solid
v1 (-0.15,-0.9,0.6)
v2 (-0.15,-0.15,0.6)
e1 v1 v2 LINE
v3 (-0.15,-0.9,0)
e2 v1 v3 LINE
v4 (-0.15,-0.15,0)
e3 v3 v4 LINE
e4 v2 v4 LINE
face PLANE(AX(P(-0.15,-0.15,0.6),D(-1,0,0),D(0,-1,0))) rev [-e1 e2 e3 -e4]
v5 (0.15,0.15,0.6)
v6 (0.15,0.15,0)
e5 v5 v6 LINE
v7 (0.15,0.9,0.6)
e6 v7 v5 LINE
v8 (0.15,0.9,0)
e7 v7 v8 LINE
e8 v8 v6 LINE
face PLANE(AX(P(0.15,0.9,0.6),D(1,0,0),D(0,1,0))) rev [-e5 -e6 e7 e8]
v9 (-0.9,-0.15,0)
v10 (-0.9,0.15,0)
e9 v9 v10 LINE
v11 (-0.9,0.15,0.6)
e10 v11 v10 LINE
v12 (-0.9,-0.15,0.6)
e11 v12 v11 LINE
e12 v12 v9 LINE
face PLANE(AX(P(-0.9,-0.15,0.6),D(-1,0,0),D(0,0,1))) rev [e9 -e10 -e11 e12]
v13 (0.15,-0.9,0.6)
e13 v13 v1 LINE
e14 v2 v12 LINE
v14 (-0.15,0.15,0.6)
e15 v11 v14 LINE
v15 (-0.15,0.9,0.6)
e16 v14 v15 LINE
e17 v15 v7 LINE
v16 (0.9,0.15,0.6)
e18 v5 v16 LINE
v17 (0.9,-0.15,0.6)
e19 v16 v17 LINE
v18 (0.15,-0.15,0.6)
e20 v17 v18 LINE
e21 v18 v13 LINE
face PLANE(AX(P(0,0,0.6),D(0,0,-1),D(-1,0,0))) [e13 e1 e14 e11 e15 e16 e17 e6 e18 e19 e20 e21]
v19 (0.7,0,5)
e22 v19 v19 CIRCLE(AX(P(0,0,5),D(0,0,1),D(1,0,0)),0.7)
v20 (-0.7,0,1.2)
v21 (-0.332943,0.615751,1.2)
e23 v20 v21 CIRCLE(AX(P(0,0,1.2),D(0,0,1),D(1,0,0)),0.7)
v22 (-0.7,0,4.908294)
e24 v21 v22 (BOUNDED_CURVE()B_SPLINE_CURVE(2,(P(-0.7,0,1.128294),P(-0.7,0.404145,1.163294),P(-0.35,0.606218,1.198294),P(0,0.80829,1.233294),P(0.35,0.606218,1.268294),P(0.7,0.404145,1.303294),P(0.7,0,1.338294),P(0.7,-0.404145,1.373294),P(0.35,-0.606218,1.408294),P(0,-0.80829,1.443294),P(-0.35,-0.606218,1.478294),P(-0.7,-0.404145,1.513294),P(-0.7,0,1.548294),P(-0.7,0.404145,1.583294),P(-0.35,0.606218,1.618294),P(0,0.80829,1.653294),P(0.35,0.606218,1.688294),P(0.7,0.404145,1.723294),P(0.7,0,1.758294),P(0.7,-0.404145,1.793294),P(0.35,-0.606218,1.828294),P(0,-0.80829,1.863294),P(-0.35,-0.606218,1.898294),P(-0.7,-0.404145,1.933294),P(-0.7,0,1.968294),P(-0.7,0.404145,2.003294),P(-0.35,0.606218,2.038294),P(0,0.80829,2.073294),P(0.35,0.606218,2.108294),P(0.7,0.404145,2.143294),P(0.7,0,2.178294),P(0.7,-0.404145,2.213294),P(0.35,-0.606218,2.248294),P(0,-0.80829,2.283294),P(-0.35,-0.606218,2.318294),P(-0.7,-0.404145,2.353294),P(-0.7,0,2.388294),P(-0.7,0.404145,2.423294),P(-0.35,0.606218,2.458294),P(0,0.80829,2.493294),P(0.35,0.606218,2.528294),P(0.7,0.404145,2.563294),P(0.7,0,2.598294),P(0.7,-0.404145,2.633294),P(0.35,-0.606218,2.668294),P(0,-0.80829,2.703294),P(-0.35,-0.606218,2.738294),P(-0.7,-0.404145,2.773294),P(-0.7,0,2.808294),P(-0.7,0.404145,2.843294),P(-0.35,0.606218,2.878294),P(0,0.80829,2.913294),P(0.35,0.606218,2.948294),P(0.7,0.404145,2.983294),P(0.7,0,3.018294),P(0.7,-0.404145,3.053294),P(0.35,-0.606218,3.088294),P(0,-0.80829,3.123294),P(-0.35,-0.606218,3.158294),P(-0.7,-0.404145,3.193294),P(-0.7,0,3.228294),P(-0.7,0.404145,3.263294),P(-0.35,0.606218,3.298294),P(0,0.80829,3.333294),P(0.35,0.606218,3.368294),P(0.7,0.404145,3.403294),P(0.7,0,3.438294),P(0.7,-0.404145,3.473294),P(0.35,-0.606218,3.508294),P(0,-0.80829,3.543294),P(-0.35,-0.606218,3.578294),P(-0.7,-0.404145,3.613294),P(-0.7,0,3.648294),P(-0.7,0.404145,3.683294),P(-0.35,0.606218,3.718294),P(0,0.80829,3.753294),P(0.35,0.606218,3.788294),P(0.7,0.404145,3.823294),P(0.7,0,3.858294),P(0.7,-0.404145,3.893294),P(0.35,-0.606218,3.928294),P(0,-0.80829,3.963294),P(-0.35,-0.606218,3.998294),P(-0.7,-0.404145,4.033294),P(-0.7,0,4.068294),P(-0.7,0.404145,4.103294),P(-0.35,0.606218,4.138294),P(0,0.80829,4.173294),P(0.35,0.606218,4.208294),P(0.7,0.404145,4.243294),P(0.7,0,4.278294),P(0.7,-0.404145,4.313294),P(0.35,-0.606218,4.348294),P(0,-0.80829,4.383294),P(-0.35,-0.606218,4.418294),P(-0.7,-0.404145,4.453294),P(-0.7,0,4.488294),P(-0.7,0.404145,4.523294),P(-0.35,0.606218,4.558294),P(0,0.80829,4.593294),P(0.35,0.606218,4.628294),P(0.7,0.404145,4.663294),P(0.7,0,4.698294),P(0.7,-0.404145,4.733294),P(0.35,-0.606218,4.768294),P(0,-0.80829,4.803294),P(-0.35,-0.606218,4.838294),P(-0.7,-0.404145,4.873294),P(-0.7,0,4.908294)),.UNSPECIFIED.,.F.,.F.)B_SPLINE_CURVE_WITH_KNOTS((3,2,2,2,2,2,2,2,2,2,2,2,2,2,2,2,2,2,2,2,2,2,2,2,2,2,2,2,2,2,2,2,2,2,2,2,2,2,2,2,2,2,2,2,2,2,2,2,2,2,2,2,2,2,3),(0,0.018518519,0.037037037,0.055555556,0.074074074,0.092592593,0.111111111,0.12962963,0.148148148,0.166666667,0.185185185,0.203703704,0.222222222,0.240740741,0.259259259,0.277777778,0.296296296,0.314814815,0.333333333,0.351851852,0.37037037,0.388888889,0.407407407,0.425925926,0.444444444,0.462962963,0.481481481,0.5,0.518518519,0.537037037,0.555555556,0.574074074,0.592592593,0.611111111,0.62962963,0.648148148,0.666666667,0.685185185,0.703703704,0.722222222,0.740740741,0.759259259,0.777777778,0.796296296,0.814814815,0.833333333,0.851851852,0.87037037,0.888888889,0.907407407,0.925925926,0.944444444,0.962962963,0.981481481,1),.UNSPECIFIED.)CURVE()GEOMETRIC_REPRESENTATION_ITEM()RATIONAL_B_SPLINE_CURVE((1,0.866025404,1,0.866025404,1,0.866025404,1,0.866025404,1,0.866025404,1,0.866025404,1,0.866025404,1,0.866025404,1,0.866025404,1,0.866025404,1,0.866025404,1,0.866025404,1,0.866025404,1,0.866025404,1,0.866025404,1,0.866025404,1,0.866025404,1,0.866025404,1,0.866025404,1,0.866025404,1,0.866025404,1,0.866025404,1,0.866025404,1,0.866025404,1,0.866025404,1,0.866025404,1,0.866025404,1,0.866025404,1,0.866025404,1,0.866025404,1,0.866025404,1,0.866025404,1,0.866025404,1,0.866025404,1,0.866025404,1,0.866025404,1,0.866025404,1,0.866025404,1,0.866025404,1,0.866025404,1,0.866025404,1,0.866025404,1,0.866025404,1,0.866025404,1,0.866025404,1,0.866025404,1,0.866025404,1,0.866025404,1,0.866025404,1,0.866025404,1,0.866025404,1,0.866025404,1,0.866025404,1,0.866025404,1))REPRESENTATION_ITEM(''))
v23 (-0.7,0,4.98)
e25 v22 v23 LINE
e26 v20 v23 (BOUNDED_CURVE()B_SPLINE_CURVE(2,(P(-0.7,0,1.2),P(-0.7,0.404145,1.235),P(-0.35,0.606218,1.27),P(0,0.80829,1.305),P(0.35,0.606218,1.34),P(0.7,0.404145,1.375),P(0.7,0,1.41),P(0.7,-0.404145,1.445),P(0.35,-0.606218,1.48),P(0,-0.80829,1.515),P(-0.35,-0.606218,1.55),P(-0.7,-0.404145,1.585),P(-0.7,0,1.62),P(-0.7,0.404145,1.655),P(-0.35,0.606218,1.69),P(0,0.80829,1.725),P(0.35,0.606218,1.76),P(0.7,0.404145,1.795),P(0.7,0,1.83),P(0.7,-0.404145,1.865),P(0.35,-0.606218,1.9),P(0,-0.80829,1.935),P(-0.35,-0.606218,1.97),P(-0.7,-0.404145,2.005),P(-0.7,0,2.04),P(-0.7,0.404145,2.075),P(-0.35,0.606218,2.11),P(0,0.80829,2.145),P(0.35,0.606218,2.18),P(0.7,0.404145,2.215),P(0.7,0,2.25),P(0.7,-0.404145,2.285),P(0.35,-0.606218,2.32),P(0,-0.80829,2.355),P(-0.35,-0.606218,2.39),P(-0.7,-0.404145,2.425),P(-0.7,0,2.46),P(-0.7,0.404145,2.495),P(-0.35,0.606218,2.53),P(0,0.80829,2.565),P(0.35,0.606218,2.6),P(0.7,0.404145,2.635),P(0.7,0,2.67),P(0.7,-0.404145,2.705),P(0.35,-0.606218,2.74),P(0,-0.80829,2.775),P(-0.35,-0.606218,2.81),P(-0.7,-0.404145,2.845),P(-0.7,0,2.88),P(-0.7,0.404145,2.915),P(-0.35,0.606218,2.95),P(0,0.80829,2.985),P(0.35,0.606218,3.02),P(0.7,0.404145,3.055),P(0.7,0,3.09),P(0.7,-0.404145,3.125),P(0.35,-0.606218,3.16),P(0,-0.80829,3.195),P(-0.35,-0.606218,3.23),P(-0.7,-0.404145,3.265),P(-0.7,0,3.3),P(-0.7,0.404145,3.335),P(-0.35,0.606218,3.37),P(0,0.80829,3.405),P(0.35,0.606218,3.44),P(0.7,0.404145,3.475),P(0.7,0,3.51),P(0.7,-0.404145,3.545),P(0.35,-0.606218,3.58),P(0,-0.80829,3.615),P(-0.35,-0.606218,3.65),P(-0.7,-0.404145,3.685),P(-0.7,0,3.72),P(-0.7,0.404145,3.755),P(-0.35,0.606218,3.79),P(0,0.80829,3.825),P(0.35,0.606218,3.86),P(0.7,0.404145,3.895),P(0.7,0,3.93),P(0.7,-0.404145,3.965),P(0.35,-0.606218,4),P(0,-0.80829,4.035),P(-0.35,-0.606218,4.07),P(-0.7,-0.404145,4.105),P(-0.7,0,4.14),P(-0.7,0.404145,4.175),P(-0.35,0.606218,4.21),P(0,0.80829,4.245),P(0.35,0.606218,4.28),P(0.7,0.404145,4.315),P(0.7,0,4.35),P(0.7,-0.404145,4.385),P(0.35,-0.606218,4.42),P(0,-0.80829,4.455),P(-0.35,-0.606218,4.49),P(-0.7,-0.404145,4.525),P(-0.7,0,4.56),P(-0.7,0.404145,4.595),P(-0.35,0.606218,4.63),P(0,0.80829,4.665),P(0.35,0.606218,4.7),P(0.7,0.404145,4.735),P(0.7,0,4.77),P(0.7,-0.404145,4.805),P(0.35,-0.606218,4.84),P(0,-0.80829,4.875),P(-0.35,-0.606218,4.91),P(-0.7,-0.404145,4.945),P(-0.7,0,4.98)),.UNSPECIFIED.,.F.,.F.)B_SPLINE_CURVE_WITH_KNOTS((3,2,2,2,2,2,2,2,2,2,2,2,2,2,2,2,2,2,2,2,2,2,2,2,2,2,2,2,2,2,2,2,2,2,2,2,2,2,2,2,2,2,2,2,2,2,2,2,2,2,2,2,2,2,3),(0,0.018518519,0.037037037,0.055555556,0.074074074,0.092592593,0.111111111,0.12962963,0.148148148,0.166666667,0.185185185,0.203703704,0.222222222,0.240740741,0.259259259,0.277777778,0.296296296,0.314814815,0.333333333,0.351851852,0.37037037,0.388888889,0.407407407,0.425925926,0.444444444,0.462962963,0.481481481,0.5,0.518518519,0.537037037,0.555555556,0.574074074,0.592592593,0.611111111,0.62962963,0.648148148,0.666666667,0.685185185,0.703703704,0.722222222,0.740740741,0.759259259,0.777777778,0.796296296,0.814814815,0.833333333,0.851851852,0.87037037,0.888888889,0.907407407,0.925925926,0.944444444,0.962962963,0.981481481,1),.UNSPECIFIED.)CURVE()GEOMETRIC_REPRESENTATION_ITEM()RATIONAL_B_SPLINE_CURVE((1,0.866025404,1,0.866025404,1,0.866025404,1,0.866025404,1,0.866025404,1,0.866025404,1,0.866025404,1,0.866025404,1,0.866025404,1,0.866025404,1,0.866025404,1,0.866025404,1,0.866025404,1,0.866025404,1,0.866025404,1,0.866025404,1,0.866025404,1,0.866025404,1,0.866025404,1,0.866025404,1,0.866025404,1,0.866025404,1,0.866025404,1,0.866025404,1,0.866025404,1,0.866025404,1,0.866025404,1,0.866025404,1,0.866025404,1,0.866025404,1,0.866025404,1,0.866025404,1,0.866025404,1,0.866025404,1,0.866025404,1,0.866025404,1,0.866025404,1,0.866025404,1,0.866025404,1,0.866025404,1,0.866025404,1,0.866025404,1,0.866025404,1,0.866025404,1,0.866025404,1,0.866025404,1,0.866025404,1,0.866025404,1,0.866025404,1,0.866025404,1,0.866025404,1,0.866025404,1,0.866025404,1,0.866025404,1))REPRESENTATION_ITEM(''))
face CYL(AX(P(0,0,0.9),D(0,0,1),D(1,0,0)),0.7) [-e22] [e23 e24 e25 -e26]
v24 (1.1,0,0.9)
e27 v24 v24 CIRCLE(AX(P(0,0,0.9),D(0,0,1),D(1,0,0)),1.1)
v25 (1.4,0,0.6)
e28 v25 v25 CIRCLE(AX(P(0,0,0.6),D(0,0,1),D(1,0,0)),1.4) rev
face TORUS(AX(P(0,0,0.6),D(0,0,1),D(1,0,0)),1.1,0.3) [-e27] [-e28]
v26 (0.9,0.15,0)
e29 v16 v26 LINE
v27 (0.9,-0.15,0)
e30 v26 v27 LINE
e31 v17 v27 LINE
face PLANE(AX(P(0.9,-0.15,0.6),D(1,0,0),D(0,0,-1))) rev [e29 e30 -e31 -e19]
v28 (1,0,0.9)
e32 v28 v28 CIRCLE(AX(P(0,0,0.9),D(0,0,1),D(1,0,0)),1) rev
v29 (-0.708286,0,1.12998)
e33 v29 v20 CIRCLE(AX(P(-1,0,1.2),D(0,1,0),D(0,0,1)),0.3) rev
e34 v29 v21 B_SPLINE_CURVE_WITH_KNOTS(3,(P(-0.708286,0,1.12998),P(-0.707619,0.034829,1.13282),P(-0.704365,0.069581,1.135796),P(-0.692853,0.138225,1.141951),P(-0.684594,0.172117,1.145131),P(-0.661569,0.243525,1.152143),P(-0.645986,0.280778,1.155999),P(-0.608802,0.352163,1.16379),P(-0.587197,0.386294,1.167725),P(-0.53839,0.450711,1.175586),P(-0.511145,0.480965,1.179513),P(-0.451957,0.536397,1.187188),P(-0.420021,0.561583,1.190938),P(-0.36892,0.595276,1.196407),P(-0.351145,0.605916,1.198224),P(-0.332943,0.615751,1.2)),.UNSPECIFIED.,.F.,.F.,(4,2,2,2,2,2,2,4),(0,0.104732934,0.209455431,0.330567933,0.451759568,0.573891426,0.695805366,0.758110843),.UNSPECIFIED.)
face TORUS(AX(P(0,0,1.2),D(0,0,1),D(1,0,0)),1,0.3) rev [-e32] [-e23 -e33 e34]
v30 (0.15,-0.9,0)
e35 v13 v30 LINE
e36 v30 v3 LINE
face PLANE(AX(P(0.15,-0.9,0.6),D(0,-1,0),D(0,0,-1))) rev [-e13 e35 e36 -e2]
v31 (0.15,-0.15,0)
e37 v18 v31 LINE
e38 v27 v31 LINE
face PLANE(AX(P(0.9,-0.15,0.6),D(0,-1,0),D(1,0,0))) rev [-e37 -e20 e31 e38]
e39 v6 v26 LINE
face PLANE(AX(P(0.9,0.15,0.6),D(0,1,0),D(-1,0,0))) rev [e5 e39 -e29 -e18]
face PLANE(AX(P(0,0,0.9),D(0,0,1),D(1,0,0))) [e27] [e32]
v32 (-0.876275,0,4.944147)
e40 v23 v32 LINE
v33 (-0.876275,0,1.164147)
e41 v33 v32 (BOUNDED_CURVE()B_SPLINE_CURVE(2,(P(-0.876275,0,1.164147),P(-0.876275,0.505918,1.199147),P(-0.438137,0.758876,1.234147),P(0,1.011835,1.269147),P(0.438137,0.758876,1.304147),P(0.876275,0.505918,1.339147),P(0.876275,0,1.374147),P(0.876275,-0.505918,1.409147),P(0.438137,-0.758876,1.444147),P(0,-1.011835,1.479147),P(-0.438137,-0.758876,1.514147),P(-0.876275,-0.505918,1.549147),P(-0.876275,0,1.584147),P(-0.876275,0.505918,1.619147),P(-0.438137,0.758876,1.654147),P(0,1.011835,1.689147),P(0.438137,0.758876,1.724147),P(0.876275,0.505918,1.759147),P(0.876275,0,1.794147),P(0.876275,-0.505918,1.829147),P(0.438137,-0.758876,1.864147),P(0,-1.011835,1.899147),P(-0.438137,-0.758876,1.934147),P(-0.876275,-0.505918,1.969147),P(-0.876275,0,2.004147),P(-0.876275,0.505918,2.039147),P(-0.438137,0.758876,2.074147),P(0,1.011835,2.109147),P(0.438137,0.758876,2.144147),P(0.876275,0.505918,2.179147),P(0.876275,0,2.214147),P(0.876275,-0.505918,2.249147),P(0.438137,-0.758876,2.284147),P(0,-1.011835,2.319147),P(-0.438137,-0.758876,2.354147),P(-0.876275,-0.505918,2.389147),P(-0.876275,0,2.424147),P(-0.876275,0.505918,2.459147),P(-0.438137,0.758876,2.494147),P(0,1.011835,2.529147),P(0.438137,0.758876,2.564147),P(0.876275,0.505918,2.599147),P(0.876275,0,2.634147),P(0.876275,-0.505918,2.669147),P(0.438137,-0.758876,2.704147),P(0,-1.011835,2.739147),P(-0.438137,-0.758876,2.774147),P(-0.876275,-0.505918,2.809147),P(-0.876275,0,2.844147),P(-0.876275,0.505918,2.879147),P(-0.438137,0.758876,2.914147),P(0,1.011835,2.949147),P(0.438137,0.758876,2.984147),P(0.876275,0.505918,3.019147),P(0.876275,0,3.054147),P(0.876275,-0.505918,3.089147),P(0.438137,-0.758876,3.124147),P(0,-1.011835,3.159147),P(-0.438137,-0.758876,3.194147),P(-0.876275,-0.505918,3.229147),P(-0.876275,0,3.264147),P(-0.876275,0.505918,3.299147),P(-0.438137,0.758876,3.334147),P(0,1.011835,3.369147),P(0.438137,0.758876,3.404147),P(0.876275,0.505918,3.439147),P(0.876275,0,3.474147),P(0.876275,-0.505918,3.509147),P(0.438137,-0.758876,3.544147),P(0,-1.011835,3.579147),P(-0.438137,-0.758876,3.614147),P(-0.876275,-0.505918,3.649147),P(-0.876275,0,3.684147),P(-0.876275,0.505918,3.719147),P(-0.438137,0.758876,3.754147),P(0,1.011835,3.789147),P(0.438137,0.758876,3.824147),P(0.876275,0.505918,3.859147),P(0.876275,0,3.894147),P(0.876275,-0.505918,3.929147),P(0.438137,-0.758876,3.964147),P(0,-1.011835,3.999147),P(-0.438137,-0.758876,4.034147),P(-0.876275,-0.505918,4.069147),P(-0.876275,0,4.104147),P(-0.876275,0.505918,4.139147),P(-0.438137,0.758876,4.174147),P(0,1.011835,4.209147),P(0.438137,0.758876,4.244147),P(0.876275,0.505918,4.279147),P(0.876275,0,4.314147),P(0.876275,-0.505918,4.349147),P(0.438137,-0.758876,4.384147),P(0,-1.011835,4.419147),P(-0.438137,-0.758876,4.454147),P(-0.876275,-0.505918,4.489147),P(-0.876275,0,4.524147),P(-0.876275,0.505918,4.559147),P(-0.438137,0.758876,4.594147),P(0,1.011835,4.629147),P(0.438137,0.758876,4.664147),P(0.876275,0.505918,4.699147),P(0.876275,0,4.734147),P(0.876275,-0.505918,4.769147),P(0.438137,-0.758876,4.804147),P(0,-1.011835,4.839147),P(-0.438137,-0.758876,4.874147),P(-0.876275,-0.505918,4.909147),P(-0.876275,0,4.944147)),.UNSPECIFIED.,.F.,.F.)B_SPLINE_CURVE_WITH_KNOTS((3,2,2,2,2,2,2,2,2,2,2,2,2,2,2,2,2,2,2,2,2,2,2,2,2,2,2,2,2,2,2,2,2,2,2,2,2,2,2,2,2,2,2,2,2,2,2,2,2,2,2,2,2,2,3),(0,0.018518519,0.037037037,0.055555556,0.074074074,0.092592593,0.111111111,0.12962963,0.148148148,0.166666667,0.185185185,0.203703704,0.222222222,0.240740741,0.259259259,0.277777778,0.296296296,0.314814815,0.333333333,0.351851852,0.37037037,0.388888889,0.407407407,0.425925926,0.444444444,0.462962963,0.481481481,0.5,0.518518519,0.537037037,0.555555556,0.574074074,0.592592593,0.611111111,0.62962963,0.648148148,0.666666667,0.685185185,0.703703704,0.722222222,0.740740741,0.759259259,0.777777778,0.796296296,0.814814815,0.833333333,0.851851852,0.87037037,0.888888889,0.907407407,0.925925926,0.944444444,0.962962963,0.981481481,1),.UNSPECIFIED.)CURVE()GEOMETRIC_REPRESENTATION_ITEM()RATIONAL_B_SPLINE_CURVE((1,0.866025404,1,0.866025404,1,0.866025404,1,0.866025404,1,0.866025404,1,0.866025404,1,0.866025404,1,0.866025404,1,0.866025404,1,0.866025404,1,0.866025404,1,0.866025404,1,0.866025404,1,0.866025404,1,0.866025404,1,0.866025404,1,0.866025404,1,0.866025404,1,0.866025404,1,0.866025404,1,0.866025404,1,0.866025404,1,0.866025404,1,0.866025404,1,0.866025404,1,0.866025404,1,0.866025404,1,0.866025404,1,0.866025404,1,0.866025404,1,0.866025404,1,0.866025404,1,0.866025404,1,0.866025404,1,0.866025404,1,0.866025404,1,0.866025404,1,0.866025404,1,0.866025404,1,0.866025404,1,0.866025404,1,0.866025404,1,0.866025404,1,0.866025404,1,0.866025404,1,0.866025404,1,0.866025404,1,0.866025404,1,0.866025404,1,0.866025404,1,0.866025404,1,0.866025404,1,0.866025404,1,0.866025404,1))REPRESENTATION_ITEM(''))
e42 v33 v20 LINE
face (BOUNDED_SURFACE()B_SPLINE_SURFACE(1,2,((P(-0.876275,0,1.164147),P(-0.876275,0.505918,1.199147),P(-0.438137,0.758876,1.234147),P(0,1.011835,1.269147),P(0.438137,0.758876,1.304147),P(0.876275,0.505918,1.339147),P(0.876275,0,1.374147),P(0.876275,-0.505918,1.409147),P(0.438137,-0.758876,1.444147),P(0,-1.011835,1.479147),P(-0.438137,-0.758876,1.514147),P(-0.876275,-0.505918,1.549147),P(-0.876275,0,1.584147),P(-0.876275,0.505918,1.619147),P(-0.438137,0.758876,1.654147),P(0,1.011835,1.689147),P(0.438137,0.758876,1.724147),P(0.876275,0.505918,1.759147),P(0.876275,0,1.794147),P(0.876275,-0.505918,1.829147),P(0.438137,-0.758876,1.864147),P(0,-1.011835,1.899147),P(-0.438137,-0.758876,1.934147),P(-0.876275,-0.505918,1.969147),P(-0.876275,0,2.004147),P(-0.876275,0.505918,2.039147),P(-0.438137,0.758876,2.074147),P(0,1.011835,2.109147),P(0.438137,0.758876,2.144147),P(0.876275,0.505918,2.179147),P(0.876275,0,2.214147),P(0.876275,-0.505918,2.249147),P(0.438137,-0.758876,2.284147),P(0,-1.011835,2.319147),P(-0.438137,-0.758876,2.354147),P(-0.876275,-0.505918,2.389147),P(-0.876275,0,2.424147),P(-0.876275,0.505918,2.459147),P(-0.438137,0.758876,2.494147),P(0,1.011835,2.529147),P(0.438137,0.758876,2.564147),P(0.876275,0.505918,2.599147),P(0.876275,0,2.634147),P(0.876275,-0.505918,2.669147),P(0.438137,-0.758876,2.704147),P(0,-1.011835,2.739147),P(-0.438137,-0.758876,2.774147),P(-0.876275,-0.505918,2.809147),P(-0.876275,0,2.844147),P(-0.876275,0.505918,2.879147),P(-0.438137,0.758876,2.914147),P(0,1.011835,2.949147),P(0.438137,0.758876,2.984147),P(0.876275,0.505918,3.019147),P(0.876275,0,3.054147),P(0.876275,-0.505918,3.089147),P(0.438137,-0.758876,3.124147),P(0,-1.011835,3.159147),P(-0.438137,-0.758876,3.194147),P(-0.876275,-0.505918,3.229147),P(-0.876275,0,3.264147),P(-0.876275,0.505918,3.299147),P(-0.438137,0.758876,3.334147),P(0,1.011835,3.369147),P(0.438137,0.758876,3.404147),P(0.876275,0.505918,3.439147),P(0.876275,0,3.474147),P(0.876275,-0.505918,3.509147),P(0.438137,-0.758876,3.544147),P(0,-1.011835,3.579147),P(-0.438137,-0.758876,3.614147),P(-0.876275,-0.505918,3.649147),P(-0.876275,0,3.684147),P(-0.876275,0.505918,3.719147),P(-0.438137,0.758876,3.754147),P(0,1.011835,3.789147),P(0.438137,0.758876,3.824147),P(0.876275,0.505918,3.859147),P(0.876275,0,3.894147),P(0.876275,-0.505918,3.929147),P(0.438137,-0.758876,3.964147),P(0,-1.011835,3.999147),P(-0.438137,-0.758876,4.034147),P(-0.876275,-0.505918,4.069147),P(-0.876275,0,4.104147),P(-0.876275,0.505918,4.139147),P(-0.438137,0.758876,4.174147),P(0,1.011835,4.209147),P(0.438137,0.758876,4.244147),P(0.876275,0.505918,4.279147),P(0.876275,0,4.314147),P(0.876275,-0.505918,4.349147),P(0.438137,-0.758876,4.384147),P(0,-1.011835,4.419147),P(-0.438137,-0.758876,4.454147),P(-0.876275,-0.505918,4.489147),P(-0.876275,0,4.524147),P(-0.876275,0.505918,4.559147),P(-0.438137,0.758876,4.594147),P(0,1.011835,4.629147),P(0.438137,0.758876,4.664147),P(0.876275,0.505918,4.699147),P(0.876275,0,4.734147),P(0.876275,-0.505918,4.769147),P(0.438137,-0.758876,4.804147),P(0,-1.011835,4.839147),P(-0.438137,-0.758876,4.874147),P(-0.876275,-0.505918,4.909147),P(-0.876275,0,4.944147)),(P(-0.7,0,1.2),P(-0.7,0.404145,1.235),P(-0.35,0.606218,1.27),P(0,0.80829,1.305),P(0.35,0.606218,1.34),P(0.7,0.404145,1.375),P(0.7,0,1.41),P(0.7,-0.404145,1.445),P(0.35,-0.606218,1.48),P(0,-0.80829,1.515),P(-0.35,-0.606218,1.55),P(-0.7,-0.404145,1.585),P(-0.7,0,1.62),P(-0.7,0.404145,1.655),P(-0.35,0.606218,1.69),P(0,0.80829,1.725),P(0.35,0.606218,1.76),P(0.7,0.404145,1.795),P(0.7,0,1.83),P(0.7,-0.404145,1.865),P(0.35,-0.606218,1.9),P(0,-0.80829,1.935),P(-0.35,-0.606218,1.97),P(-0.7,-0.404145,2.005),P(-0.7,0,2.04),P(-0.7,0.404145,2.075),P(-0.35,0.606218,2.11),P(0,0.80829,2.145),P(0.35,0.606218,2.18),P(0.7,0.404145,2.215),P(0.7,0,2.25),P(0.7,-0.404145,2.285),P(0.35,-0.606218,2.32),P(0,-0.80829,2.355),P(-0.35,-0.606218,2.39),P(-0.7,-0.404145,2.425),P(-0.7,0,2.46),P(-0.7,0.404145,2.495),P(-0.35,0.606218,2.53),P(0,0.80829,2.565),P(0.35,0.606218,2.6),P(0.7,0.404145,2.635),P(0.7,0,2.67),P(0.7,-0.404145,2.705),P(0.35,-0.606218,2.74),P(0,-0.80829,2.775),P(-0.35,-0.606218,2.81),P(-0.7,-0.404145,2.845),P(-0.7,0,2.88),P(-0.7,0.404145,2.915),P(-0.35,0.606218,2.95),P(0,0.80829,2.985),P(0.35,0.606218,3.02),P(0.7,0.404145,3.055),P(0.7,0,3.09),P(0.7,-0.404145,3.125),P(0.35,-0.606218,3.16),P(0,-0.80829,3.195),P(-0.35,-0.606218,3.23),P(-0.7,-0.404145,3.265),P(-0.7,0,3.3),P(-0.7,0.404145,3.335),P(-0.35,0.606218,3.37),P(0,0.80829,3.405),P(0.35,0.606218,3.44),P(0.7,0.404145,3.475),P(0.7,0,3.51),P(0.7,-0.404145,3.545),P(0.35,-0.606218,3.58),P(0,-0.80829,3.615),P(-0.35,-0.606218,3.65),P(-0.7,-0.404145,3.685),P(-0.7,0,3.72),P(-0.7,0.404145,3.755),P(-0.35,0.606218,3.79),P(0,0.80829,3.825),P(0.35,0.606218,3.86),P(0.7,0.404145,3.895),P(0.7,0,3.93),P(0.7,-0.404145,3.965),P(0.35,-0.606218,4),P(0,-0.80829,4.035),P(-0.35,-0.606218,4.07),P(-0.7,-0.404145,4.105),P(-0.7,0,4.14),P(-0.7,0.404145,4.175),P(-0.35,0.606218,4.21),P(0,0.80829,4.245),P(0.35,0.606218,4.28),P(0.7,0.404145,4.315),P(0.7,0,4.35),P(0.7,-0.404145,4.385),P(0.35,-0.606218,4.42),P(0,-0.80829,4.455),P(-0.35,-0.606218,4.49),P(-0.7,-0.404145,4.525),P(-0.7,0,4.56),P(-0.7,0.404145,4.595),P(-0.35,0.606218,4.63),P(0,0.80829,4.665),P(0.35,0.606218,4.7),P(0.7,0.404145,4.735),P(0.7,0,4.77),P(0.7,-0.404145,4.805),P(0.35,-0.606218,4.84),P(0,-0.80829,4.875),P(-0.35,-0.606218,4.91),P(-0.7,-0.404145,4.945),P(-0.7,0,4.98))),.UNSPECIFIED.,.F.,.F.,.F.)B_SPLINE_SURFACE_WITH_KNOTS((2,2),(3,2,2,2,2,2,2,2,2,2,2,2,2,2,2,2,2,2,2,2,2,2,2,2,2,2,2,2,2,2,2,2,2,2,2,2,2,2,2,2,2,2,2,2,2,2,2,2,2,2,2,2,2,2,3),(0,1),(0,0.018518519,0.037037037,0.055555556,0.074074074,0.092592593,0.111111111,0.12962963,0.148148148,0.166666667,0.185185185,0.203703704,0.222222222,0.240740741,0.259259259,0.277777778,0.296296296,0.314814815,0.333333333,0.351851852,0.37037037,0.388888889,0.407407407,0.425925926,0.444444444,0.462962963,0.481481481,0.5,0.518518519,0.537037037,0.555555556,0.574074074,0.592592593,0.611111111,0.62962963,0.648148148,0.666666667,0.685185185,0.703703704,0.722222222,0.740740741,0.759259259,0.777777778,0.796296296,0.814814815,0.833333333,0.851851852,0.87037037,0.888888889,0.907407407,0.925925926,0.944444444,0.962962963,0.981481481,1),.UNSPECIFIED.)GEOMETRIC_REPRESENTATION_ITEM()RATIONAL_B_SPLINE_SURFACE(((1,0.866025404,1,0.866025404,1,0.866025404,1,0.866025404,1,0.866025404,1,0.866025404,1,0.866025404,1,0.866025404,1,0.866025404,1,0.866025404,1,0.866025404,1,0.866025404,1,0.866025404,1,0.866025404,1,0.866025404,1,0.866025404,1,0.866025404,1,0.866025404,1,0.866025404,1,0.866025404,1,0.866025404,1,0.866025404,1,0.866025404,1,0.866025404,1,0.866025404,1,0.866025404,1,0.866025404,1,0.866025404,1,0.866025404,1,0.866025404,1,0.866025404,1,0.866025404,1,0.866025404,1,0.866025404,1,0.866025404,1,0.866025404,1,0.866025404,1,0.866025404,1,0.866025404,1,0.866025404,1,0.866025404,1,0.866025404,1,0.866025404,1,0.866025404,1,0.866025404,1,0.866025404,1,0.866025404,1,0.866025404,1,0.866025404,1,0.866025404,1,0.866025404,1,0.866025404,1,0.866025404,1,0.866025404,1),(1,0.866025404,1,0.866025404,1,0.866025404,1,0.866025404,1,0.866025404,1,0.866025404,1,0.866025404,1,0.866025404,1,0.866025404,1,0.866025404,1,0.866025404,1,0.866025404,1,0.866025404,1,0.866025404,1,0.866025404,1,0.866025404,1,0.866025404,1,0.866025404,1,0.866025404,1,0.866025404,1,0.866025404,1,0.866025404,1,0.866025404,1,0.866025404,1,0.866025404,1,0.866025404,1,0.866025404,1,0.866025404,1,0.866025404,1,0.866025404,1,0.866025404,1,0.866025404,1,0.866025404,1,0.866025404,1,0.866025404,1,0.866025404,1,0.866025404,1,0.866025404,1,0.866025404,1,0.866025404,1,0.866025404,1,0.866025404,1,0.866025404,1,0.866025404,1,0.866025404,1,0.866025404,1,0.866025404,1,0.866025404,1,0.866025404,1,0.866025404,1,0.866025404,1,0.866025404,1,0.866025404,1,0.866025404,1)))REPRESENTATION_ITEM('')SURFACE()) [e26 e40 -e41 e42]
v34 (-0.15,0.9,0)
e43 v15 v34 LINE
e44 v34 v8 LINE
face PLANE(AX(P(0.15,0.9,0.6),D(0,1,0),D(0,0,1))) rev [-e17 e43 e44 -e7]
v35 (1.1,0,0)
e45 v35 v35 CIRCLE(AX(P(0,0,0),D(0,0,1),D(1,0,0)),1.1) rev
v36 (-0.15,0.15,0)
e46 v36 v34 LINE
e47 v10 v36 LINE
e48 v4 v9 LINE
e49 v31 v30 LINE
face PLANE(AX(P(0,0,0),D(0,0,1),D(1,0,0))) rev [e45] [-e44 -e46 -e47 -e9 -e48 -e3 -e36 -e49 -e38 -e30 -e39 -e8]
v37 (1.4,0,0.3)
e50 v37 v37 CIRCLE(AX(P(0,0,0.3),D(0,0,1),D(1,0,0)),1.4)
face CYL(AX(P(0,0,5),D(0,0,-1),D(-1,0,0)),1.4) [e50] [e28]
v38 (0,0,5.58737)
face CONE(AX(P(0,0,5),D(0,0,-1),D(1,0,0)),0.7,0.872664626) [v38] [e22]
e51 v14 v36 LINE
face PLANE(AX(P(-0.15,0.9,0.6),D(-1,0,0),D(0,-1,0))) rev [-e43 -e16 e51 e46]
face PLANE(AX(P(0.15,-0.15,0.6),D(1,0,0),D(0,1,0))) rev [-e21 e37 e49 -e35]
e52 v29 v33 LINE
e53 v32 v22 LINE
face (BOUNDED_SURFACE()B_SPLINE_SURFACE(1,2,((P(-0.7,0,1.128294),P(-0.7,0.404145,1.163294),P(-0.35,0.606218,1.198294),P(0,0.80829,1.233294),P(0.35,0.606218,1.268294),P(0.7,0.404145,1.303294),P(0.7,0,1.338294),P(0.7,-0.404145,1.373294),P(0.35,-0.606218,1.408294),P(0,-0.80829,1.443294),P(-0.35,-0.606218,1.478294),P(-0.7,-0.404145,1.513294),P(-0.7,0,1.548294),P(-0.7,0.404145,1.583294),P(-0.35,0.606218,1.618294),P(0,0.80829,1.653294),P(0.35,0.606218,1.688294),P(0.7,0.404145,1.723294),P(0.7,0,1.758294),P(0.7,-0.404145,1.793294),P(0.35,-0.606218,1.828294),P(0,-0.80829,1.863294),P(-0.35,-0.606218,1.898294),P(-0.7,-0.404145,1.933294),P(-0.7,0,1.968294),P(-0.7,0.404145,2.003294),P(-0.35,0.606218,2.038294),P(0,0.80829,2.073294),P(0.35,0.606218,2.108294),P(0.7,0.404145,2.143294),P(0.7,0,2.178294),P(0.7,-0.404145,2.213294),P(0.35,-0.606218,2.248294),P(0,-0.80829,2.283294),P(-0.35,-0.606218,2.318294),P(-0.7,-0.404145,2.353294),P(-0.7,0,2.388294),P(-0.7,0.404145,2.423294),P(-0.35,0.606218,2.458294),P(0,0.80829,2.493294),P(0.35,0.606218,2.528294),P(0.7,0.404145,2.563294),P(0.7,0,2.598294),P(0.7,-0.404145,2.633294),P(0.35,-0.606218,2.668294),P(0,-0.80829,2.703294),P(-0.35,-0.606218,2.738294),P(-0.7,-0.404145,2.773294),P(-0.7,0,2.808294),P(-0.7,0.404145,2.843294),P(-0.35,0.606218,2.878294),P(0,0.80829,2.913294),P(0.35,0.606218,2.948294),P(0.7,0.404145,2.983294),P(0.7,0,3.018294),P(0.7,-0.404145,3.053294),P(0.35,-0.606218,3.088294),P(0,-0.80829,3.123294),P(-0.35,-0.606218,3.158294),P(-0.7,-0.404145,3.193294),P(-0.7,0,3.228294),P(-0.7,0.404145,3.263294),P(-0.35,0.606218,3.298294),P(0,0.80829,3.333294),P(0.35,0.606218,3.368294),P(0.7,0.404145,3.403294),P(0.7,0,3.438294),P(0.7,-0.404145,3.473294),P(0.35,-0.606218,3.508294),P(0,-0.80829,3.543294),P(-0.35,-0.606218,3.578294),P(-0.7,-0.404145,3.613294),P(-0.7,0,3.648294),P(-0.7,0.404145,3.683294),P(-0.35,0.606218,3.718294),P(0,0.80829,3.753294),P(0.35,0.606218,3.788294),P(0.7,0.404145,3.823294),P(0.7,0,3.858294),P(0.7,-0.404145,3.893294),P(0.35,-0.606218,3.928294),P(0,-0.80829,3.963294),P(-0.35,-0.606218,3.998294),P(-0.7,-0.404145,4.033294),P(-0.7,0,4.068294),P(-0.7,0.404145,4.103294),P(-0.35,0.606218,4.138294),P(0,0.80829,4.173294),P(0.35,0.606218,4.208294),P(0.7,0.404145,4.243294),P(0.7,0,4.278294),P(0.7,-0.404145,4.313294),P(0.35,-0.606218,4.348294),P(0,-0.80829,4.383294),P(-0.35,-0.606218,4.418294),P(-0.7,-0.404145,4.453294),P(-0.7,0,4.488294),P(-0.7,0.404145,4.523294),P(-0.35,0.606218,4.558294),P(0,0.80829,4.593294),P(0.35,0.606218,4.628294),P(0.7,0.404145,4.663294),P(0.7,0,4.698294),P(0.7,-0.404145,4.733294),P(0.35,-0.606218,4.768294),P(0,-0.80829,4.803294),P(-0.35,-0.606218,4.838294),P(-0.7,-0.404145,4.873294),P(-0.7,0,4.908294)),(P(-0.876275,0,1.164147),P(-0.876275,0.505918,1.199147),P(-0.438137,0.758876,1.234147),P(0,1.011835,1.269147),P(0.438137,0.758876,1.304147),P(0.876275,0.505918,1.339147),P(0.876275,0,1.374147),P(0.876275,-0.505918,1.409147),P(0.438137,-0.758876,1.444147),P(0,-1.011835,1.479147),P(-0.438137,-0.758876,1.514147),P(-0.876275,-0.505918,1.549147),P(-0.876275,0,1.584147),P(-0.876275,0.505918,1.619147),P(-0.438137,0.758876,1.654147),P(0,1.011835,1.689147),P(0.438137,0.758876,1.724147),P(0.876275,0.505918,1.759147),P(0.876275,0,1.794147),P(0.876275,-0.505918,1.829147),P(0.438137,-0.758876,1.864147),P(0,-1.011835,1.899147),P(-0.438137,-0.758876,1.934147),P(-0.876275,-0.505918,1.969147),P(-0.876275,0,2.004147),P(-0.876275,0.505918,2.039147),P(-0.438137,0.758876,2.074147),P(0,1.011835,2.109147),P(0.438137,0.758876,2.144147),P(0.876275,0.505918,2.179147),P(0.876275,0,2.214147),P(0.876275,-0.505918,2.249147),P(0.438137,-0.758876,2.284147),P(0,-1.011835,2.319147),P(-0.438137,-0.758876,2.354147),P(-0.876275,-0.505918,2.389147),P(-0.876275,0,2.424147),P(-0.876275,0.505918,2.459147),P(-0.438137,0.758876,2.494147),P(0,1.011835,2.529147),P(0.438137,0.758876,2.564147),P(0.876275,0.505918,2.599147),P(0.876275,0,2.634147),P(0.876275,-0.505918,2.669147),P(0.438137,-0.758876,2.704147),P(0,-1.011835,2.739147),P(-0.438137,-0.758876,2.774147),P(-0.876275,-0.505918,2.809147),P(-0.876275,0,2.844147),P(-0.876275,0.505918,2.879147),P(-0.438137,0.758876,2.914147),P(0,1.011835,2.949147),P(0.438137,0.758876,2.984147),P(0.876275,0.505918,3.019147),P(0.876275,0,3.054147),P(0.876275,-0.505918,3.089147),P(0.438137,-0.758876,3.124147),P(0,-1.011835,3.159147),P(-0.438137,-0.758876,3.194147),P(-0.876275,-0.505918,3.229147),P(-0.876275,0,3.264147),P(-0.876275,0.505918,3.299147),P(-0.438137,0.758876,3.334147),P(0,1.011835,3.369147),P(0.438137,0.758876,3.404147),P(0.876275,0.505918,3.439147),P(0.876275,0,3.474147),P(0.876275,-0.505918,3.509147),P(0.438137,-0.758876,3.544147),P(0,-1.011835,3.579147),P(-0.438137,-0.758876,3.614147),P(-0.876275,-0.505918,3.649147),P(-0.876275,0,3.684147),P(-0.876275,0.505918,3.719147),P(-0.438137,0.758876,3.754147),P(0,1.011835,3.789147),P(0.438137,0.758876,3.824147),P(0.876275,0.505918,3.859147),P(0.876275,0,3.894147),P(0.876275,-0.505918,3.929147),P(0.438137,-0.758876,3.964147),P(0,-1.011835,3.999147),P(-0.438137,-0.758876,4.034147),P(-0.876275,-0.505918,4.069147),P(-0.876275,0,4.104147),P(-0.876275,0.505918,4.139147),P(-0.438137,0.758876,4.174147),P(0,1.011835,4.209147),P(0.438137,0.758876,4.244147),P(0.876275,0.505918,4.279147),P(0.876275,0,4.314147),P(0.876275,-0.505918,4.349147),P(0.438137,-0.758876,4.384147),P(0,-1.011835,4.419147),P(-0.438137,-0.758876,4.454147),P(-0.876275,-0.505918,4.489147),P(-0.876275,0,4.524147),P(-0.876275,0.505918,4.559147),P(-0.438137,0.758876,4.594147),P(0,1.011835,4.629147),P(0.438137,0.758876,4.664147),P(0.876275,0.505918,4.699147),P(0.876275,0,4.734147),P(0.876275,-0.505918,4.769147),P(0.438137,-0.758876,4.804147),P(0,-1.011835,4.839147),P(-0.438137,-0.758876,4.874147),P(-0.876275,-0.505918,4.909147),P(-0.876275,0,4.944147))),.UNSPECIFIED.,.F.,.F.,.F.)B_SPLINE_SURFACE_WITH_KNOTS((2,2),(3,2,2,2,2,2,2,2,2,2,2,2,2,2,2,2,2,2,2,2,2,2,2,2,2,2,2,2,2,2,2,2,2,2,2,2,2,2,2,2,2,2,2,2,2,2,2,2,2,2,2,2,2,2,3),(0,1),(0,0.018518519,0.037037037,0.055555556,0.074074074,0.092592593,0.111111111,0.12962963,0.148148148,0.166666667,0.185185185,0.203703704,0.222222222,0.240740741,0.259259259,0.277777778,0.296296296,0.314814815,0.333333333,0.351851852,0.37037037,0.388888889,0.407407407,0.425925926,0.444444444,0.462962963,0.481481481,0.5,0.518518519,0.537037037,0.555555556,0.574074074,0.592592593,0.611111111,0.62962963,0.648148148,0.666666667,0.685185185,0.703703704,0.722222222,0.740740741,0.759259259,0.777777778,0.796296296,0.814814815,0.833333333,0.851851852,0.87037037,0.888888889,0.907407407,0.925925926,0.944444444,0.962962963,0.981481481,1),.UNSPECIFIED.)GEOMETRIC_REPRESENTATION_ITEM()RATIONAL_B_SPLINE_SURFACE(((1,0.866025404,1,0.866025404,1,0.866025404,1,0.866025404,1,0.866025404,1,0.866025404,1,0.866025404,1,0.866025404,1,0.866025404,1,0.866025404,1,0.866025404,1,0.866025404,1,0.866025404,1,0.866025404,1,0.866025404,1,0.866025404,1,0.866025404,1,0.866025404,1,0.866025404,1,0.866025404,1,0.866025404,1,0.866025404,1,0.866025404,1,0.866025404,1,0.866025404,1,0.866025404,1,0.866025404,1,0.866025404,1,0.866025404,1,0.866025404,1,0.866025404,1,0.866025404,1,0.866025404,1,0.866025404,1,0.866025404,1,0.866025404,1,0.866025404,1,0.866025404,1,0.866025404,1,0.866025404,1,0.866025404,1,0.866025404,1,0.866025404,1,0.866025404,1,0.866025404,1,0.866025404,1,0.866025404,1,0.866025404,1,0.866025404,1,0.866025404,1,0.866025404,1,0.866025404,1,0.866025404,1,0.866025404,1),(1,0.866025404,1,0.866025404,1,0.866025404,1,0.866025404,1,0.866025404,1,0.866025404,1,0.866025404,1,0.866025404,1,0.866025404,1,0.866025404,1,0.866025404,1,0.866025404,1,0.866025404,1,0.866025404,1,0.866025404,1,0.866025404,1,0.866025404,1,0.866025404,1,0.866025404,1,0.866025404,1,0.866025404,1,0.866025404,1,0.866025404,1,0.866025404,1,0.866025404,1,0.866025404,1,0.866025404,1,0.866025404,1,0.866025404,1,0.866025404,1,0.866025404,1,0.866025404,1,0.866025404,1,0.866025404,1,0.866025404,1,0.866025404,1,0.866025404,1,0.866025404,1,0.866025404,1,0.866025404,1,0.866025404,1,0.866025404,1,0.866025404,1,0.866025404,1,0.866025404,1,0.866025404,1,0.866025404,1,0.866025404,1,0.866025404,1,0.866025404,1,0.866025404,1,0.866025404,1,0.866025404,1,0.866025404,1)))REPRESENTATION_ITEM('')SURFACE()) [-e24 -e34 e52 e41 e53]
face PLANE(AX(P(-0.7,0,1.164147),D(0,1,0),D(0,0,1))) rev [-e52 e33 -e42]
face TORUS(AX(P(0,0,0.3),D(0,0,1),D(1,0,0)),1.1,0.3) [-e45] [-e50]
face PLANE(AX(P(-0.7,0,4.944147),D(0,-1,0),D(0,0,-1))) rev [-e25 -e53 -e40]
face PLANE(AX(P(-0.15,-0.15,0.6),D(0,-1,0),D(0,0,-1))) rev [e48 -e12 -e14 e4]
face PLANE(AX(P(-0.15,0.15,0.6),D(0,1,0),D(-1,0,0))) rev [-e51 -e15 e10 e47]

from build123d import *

# Parameters (mm, degrees)
SKETCH1_R           = 1.4
BOSS_EXTRUDE1_DEPTH = 5
CUT_EXTRUDE1_START  = -4.1
SKETCH2_R           = 1.4
SKETCH2_R_2         = 0.7
CUT_EXTRUDE1_DEPTH  = 4.1
SKETCH3_R           = 0.7
BOSS_EXTRUDE2_DEPTH = 0.6
BOSS_EXTRUDE2_TAPER = 50
FILLET1_R           = 0.3
FILLET2_R           = 0.3
CUT_EXTRUDE2_DEPTH  = 0.6
SWEEP1_PITCH        = 0.42


with BuildPart() as part:
    # Sketch1 → Boss-Extrude1 (new body)
    with BuildSketch(Plane.XY):
        Circle(SKETCH1_R)
    extrude(amount=BOSS_EXTRUDE1_DEPTH)

    # Sketch2 → Cut-Extrude1 (cut)
    with BuildSketch(Plane.XY.offset(5).offset(CUT_EXTRUDE1_START)):
        Circle(SKETCH2_R)
        Circle(SKETCH2_R_2, mode=Mode.SUBTRACT)
    extrude(amount=CUT_EXTRUDE1_DEPTH, mode=Mode.SUBTRACT)

    # Sketch3 → Boss-Extrude2 (add)
    with BuildSketch(Plane.XY.offset(5)):
        Circle(SKETCH3_R)
    extrude(amount=BOSS_EXTRUDE2_DEPTH, taper=BOSS_EXTRUDE2_TAPER)

    # Fillet1
    fillet1_edges = [part.edges().sort_by_distance(p)[0] for p in [
        (-1.4, 0, 0),
        (-1.4, 0, 0.9),
    ]]
    fillet(fillet1_edges, radius=FILLET1_R)

    # Fillet2
    fillet2_edges = [part.edges().sort_by_distance(p)[0] for p in [
        (-0.7, 0, 0.9),
    ]]
    fillet(fillet2_edges, radius=FILLET2_R)

    # Sketch4 → Cut-Extrude2 (cut)
    with BuildSketch(Plane(origin=(0, 0, 0), x_dir=(-1, 0, 0), z_dir=(0, 0, -1))):
        Polygon((-0.15, -0.15), (-0.15, -0.9), (0.15, -0.9), (0.15, -0.15), (0.9, -0.15), (0.9, 0.15), (0.15, 0.15), (0.15, 0.9), (-0.15, 0.9), (-0.15, 0.15), (-0.9, 0.15), (-0.9, -0.15), align=None)
    extrude(amount=-CUT_EXTRUDE2_DEPTH, mode=Mode.SUBTRACT)

    # Sweep1: the profile of Sketch6 profile screwed along a left-hand helix of 9 turns, 6 arcs to a turn; built about Z, then put on its axis
    sweep1_z = Axis((0, 0, 0), (0, 0, 1))
    sweep1_corners = [(0.6997, 0, 6.1018e-05), (0.6997, 0, -0.071766728), (0.876274823, 0, -0.035852855)]
    with BuildLine(mode=Mode.PRIVATE) as sweep1_profile:
        Line(sweep1_corners[0], sweep1_corners[1])
        Line(sweep1_corners[1], sweep1_corners[2])
        Line(sweep1_corners[2], sweep1_corners[0])
    sweep1_cap = Face(sweep1_profile.wire())
    sweep1_turn_angles = [0, -30, -60, -90, -120, -150, -180, -210, -240, -270, -300, -330, -360]
    sweep1_turn_weights = [1, 0.8660254037844387, 1, 0.8660254037844387, 1, 0.8660254037844387, 1, 0.8660254037844387, 1, 0.8660254037844387, 1, 0.8660254037844387, 1]
    sweep1_turn_rails = [Edge.make_bspline([Vector(p[0], p[1], 0).rotate(sweep1_z, sweep1_turn_angles[k]) / sweep1_turn_weights[k] + Vector(0, 0, p[2] + -SWEEP1_PITCH * sweep1_turn_angles[k] / 360) for k in range(13)], [0, 0, 0, 1, 1, 2, 2, 3, 3, 4, 4, 5, 5, 6, 6, 6], 2, sweep1_turn_weights) for p in sweep1_corners]
    sweep1_turn_sides = [Face.make_surface_from_curves(sweep1_turn_rails[p[0]], sweep1_turn_rails[p[1]]) for p in [(0, 1), (1, 2), (2, 0)]]
    sweep1 = Plane(origin=(0, 0, 1.2), x_dir=(-1, 0, 0), z_dir=(0, 0, 1)) * Solid(Shell([*[p.moved(Location((0, 0, SWEEP1_PITCH * i))) for i in range(9) for p in sweep1_turn_sides], sweep1_cap, sweep1_cap.rotate(sweep1_z, -3240).moved(Location((0, 0, -SWEEP1_PITCH * -3240 / 360)))]))
    add(sweep1)


solid = part.part
